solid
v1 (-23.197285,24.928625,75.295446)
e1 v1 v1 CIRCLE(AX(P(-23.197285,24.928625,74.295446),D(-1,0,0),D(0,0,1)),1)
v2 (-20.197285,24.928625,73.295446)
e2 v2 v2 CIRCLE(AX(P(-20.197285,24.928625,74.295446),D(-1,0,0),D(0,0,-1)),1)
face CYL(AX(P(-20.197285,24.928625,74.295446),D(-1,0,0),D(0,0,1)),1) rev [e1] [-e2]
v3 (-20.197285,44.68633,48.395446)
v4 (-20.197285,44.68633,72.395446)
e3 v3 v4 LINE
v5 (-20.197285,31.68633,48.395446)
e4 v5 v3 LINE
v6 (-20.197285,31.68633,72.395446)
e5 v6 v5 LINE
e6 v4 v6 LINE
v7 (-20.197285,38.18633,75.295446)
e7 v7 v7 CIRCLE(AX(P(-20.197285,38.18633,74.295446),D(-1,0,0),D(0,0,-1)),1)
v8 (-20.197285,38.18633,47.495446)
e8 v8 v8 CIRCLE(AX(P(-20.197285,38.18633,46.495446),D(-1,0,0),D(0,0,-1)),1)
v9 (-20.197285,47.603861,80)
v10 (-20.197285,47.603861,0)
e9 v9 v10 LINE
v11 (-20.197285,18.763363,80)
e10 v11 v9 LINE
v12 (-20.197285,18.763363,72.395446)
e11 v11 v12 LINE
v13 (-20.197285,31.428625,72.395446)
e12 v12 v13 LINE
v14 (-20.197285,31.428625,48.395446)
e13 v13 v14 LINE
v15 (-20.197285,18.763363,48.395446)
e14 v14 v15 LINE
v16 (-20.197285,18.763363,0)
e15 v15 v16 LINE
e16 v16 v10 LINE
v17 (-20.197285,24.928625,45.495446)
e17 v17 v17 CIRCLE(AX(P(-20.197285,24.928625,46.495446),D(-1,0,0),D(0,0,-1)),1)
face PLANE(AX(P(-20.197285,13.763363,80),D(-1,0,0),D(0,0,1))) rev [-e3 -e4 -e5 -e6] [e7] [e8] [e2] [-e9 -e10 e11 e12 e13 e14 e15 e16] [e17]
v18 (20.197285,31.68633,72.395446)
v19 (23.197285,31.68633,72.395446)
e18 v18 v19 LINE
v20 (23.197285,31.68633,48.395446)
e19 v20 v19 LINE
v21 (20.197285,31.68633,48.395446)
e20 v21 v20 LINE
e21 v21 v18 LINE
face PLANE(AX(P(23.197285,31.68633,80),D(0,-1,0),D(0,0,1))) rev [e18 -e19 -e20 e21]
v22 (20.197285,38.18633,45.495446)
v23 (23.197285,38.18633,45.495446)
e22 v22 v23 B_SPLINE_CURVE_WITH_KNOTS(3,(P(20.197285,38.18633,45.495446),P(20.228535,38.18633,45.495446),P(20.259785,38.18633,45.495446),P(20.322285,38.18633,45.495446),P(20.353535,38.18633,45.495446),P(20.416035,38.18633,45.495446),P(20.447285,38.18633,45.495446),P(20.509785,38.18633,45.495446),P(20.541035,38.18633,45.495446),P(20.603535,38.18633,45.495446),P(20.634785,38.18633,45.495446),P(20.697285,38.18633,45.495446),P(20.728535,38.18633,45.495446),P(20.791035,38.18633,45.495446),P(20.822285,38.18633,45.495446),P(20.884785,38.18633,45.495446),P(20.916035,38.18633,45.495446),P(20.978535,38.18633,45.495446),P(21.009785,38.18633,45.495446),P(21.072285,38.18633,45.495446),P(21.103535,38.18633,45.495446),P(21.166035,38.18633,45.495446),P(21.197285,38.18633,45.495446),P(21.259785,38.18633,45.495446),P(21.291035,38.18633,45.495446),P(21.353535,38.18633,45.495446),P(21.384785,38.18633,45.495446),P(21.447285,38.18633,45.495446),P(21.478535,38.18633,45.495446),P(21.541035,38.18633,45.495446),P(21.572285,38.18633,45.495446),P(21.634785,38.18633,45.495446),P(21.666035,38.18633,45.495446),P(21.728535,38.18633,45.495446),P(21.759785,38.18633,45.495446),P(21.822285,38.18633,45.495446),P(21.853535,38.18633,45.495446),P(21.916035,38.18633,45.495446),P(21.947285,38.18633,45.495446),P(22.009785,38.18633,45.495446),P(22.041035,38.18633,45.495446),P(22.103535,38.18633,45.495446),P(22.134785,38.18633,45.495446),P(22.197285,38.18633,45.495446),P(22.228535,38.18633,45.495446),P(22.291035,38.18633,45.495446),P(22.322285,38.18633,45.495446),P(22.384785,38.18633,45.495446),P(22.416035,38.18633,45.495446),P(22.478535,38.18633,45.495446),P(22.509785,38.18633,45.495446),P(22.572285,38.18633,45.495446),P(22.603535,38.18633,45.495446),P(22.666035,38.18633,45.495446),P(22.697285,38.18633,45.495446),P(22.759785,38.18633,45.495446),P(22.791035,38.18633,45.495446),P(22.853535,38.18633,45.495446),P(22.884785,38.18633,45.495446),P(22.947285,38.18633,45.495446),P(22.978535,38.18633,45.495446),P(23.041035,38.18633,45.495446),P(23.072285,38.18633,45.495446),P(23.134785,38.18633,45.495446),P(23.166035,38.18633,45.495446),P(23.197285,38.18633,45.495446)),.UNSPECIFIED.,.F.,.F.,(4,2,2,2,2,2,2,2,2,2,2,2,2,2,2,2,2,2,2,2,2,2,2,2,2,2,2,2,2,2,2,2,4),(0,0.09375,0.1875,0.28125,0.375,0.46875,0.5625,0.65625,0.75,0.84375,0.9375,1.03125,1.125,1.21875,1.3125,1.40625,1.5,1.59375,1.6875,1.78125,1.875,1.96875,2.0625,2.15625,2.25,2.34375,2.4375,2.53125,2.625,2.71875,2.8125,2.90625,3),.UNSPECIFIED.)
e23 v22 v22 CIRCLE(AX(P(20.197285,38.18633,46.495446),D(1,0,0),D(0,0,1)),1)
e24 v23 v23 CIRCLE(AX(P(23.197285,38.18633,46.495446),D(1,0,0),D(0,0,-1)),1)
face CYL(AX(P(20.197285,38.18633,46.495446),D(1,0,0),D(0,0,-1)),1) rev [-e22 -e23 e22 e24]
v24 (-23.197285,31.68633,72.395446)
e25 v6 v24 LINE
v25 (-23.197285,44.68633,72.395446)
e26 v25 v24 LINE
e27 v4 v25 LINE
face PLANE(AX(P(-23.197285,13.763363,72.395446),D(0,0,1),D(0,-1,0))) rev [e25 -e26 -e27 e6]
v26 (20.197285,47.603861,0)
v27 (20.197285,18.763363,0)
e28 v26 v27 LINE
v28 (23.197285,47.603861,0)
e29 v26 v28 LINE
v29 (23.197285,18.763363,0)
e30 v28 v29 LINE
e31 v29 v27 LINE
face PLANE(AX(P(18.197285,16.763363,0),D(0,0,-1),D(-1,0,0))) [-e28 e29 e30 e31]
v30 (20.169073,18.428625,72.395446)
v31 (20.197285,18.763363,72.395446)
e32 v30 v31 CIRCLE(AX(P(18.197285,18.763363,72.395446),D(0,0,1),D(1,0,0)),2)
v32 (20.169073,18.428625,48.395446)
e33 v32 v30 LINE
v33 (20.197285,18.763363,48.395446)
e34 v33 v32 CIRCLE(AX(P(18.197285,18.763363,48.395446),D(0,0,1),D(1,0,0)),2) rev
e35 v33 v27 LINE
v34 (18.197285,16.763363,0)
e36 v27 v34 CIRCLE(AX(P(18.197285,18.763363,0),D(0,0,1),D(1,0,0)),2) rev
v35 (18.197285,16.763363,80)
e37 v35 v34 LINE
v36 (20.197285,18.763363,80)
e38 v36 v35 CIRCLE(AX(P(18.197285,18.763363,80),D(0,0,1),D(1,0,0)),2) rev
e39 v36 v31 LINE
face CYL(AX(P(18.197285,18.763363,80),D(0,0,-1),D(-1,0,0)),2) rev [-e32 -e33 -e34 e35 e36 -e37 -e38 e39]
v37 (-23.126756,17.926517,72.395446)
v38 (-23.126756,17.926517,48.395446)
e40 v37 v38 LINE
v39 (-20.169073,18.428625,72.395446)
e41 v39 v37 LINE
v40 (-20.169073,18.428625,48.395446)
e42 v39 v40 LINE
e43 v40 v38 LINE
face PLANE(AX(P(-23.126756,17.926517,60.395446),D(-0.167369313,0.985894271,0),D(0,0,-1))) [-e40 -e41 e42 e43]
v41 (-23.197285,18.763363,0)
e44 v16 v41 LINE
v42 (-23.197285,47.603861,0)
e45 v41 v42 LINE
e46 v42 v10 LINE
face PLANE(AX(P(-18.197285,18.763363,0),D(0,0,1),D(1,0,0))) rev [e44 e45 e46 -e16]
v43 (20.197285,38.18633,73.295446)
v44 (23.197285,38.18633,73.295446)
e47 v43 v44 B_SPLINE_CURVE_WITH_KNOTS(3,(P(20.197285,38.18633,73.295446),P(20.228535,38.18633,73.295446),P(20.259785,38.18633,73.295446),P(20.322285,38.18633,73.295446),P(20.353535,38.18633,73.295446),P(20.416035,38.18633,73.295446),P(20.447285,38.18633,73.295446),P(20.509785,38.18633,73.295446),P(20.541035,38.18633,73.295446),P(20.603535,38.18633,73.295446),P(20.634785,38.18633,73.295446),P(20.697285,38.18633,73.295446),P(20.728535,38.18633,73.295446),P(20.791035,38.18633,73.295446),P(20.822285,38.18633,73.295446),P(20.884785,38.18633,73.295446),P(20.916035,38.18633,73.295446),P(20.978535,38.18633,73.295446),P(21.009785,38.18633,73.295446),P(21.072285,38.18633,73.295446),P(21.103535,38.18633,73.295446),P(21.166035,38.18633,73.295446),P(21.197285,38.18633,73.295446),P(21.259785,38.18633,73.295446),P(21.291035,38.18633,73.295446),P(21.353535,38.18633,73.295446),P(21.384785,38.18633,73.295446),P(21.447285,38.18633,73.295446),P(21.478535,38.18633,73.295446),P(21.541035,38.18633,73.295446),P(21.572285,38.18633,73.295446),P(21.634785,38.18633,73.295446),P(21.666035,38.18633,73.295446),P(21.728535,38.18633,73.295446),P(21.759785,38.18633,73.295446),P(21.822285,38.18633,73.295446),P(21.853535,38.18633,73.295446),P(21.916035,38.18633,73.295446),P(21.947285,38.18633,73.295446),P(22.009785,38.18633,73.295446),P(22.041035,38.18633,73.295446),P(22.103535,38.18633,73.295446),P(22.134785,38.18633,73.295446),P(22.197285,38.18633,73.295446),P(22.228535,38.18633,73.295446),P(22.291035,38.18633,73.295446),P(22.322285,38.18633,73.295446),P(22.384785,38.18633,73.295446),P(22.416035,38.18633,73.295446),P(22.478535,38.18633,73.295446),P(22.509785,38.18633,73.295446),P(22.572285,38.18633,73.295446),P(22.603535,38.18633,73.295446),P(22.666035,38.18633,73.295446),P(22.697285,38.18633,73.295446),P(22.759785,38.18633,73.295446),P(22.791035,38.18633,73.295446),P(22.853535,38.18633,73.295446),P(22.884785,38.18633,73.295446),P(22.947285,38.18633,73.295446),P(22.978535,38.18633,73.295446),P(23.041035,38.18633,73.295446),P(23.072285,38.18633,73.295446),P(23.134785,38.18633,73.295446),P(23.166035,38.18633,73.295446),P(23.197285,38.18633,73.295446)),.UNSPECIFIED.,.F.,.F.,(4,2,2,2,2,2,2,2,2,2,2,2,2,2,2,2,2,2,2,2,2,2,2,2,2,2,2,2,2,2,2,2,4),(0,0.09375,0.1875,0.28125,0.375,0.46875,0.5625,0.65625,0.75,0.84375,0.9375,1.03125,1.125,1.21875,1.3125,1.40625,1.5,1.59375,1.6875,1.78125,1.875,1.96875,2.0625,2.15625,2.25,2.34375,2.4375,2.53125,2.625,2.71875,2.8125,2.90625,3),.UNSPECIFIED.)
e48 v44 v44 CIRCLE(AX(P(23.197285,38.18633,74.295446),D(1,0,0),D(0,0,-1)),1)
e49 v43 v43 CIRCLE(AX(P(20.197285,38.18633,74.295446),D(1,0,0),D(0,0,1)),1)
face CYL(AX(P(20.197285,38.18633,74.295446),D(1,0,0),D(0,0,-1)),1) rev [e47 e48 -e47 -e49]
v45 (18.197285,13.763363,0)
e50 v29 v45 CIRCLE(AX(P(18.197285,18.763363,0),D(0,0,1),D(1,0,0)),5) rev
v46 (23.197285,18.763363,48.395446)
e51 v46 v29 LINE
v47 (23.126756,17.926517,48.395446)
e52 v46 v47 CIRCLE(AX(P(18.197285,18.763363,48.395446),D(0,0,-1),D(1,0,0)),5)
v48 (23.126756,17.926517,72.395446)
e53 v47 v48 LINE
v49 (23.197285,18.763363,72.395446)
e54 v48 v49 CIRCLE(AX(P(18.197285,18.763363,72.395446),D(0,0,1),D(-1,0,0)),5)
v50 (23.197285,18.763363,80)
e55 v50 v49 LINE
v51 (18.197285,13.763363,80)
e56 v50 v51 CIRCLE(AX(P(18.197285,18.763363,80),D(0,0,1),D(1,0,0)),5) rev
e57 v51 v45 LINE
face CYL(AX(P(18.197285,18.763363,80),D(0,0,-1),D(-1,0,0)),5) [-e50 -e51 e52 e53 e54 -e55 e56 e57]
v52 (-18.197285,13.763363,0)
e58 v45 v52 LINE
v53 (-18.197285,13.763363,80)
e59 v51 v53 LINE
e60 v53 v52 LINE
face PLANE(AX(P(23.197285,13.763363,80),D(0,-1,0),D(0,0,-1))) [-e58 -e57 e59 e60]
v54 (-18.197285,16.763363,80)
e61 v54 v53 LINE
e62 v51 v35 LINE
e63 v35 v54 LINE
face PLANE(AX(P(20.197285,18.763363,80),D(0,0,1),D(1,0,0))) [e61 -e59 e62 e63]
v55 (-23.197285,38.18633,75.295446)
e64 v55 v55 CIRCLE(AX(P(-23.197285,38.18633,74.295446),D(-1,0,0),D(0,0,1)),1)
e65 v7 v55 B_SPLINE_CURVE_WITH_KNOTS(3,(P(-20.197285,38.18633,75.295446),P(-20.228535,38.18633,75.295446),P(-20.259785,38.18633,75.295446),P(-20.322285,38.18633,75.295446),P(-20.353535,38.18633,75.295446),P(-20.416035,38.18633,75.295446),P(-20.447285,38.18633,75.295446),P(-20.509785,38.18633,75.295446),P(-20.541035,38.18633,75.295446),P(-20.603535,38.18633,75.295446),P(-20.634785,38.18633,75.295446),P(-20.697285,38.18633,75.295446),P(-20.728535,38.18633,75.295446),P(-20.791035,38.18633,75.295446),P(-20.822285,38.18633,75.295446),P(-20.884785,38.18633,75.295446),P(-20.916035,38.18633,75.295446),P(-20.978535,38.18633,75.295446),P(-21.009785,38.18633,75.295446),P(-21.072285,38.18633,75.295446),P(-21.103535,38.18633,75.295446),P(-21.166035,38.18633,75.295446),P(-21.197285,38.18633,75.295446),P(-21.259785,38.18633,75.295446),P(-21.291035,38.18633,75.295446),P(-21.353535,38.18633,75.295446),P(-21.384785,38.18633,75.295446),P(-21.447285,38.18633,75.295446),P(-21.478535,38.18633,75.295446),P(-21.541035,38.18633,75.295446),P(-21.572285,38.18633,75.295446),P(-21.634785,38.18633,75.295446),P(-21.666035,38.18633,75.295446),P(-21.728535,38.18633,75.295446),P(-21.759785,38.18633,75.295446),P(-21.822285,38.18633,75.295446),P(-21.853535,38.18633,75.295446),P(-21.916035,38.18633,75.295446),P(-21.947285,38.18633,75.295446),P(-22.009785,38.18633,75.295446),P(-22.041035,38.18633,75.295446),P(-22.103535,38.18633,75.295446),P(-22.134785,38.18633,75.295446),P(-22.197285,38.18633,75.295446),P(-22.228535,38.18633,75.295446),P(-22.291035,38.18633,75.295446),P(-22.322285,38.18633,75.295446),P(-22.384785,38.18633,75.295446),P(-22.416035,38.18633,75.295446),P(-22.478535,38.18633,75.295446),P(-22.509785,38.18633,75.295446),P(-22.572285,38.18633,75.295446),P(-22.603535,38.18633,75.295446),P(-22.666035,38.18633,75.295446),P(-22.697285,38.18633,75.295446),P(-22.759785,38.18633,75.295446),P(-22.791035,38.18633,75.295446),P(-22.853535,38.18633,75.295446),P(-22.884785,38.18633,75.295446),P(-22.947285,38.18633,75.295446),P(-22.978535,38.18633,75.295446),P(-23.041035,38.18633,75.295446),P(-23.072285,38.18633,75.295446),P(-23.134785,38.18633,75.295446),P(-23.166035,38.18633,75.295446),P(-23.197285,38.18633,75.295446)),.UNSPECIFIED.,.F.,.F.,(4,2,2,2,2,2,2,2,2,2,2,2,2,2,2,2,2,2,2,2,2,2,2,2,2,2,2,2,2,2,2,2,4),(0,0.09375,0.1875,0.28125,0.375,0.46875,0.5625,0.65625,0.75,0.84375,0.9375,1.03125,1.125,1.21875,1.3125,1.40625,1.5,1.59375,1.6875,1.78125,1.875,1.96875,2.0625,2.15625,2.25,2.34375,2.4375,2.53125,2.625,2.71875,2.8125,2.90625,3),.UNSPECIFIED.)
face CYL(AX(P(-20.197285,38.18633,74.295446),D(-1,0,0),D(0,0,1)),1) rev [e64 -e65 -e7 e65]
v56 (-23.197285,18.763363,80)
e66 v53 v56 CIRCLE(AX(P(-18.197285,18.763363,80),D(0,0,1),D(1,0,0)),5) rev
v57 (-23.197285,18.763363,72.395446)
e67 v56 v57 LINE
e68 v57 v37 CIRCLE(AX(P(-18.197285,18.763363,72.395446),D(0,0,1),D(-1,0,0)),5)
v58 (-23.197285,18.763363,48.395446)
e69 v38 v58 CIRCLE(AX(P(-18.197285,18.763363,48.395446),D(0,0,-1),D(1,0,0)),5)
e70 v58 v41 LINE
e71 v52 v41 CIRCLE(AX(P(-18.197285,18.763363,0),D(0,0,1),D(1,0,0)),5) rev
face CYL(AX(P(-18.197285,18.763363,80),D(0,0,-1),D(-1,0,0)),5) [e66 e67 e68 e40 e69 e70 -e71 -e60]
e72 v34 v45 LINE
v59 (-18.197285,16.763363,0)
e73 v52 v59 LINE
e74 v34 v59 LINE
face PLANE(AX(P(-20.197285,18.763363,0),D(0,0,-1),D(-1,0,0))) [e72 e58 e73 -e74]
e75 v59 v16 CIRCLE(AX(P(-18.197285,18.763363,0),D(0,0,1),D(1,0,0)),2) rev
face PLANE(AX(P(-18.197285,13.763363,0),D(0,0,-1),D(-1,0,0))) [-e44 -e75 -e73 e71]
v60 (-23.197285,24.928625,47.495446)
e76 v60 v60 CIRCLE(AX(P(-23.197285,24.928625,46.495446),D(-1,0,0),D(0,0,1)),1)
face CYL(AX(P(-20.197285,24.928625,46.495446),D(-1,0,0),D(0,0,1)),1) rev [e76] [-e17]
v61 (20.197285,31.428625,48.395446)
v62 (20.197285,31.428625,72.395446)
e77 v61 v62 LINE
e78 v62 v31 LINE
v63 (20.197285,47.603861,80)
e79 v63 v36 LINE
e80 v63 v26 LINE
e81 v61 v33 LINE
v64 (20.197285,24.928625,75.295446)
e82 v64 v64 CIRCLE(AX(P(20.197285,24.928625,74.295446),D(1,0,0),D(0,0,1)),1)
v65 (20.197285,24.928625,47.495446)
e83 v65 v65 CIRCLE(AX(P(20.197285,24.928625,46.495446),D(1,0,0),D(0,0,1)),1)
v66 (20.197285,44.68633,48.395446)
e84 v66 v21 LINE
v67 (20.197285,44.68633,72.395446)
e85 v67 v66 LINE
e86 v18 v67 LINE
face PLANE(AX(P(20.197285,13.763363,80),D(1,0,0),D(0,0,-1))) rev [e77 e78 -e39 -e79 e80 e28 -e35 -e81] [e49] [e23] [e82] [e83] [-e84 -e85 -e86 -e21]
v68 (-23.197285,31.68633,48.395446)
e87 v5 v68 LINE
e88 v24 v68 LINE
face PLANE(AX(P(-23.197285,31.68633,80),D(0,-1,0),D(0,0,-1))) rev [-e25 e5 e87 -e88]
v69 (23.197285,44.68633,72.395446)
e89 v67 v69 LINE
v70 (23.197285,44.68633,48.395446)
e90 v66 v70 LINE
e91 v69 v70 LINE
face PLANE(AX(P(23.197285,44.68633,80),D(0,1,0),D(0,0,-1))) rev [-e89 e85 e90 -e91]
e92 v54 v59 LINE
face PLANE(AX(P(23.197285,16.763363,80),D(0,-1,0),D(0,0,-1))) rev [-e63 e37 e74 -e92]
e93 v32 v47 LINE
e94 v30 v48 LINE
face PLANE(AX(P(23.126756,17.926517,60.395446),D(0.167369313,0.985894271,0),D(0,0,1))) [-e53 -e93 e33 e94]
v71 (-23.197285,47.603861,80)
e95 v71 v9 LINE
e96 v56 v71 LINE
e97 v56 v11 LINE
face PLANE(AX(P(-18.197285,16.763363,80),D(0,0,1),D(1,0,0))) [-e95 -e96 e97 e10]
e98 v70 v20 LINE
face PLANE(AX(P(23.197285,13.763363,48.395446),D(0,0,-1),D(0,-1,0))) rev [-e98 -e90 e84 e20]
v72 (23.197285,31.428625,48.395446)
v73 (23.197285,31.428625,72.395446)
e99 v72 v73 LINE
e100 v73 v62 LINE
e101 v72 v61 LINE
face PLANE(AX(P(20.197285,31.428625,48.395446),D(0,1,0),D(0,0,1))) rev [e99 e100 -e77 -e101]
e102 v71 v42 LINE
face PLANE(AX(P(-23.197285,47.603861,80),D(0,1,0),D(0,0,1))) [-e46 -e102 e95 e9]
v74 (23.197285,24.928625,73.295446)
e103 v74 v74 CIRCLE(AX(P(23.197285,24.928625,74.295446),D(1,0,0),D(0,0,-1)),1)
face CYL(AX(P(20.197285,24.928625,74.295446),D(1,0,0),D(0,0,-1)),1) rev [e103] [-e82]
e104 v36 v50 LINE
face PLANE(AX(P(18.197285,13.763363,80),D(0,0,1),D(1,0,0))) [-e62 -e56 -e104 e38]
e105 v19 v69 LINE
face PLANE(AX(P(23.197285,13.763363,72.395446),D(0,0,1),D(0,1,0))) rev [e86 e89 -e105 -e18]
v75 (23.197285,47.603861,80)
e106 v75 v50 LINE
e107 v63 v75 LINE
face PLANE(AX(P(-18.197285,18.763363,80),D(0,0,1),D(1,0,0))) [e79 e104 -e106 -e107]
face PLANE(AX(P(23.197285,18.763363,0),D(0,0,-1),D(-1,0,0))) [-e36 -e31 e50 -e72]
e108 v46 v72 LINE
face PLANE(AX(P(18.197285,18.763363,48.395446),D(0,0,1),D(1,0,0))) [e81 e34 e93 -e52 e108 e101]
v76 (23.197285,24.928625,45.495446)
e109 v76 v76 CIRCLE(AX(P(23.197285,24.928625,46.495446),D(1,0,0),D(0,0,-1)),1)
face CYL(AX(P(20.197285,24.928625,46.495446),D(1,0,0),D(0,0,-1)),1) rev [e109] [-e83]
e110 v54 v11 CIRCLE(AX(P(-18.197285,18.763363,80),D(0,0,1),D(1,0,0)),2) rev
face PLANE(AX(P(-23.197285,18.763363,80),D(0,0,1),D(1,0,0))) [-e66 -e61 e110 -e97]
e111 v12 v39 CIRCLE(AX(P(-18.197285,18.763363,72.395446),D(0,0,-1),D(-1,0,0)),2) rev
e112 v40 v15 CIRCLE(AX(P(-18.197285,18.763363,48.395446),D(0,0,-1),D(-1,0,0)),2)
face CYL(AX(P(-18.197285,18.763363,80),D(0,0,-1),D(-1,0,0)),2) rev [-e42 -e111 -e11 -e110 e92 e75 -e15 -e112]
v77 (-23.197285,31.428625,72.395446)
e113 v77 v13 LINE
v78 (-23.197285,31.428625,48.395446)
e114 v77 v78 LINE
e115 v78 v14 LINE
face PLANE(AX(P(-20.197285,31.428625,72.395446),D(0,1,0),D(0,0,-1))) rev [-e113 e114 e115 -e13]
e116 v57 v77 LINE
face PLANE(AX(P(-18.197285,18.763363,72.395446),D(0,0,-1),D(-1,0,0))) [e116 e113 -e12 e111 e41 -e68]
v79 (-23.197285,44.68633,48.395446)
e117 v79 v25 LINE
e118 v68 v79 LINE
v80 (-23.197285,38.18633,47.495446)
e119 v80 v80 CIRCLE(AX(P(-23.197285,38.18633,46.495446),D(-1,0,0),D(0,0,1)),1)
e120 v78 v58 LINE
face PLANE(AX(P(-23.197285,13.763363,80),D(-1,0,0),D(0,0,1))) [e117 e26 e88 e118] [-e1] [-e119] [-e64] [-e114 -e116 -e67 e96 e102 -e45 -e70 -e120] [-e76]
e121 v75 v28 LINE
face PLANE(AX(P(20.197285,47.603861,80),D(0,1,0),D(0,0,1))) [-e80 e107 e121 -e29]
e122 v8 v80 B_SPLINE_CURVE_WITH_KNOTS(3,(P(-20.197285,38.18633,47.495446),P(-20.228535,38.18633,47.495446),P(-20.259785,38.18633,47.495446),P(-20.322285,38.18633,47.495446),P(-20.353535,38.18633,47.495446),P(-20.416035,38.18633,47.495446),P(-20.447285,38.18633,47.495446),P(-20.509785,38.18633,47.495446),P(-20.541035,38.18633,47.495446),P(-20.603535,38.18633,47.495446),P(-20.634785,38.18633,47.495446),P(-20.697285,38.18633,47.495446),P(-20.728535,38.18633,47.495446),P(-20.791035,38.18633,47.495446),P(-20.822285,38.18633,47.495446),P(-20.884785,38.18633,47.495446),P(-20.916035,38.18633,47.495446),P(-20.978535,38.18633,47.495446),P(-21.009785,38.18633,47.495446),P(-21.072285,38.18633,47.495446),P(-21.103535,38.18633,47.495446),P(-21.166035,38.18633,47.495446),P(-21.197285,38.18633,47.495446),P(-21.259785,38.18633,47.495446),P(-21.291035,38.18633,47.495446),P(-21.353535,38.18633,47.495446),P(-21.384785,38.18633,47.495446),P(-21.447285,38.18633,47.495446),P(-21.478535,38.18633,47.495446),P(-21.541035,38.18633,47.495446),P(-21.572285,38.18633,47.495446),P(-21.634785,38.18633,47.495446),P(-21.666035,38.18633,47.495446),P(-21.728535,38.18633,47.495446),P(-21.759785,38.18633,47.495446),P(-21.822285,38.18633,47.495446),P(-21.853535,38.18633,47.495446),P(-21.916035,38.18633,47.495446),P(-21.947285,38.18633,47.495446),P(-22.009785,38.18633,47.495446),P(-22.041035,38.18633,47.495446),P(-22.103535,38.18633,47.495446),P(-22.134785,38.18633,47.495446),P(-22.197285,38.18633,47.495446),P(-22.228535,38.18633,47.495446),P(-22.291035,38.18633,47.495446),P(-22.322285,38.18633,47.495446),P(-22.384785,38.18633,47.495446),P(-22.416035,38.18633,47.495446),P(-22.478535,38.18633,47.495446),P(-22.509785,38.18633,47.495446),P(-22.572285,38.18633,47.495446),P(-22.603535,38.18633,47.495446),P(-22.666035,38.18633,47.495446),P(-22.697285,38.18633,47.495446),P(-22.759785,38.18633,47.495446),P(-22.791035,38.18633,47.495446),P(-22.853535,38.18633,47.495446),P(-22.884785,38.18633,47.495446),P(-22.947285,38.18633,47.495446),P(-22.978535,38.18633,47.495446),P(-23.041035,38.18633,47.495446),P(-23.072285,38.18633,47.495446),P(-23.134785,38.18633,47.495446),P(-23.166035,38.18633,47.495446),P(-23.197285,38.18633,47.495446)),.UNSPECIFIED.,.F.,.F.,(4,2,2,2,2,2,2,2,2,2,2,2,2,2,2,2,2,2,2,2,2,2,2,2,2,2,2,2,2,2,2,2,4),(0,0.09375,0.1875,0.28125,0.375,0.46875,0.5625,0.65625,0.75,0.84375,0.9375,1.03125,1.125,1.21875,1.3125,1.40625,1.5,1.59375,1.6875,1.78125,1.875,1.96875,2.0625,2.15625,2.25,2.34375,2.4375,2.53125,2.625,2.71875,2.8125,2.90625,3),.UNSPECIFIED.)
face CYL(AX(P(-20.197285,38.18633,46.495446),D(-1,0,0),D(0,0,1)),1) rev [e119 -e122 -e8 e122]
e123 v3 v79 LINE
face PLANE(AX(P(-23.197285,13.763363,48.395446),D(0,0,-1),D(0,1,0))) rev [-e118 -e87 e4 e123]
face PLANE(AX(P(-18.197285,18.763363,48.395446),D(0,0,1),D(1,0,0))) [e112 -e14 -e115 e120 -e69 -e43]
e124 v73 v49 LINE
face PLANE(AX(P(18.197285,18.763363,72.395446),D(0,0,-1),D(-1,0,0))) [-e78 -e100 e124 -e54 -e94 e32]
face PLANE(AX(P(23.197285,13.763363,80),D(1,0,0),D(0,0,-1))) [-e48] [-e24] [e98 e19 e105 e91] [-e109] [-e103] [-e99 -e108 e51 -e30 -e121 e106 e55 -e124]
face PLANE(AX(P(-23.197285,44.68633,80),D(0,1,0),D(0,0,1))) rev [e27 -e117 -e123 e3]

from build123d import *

# Parameters (mm, degrees)
BASE_FLANGE1_DEPTH       = 80
CUT_EXTRUDE1_START       = 48.39544582
CUT_EXTRUDE1_OUTLINE_W   = 3
CUT_EXTRUDE1_OUTLINE_H   = 13
CUT_EXTRUDE1_DEPTH       = 24
CUT_EXTRUDE1_START_2     = -46.394569282
CUT_EXTRUDE1_2_OUTLINE_R = 1
CUT_EXTRUDE1_2_DEPTH     = 46.394569282


# Read off the part's stored shape, not the designer's step: Cut-Extrude1
# Sheet-metal steps are written as plain solids
with BuildPart() as part:
    # Sketch1 → Base-Flange1 (new body)
    with BuildSketch(Plane.XY):
        with BuildLine():
            Line((23.197284641, 47.603861413), (23.197284641, 18.763363208))
            ThreePointArc((23.197284641, 18.763363208), (21.732818547, 15.227829302), (18.197284641, 13.763363208))
            Line((18.197284641, 13.763363208), (-18.197284641, 13.763363208))
            ThreePointArc((-18.197284641, 13.763363208), (-21.732818547, 15.227829302), (-23.197284641, 18.763363208))
            Line((-23.197284641, 18.763363208), (-23.197284641, 47.603861413))
            Line((-23.197284641, 47.603861413), (-20.197284641, 47.603861413))
            Line((-20.197284641, 47.603861413), (-20.197284641, 18.763363208))
            ThreePointArc((-20.197284641, 18.763363208), (-19.611498203, 17.349149646), (-18.197284641, 16.763363208))
            Line((-18.197284641, 16.763363208), (18.197284641, 16.763363208))
            ThreePointArc((18.197284641, 16.763363208), (19.611498203, 17.349149646), (20.197284641, 18.763363208))
            Line((20.197284641, 18.763363208), (20.197284641, 47.603861413))
            Line((20.197284641, 47.603861413), (23.197284641, 47.603861413))
        make_face()
    extrude(amount=BASE_FLANGE1_DEPTH)

    # Cut-Extrude1 outline → Cut-Extrude1 (cut)
    with BuildSketch(Plane.XY.offset(CUT_EXTRUDE1_START)):
        with BuildLine():
            Line((-20.197284641, 18.763363208), (-20.197284641, 31.428624583))
            Line((-20.197284641, 31.428624583), (-23.197284641, 31.428624583))
            Line((-23.197284641, 31.428624583), (-23.197284641, 18.763363208))
            ThreePointArc((-23.197284641, 18.763363208), (-23.17962128, 18.343456534), (-23.126755995, 17.926516645))
            Line((-23.126755995, 17.926516645), (-20.169073182, 18.428624583))
            ThreePointArc((-20.169073182, 18.428624583), (-20.190219297, 18.595400538), (-20.197284641, 18.763363208))
        make_face()
        with Locations((-21.697284641, 38.186330489)):
            Rectangle(CUT_EXTRUDE1_OUTLINE_W, CUT_EXTRUDE1_OUTLINE_H)
        with BuildLine():
            Line((23.197284641, 18.763363208), (23.197284641, 31.428624583))
            Line((23.197284641, 31.428624583), (20.197284641, 31.428624583))
            Line((20.197284641, 31.428624583), (20.197284641, 18.763363208))
            ThreePointArc((20.197284641, 18.763363208), (20.190219297, 18.595400538), (20.169073182, 18.428624583))
            Line((20.169073182, 18.428624583), (23.126755995, 17.926516645))
            ThreePointArc((23.126755995, 17.926516645), (23.17962128, 18.343456534), (23.197284641, 18.763363208))
        make_face()
        with Locations((21.697284641, 38.186330489)):
            Rectangle(CUT_EXTRUDE1_OUTLINE_W, CUT_EXTRUDE1_OUTLINE_H)
    extrude(amount=CUT_EXTRUDE1_DEPTH, mode=Mode.SUBTRACT)

    # Cut-Extrude1 2 outline → Cut-Extrude1 2 (cut)
    with BuildSketch(Plane.ZY.offset(23.197284641).offset(CUT_EXTRUDE1_START_2)):
        with Locations((74.29544582, 24.928624583)):
            Circle(CUT_EXTRUDE1_2_OUTLINE_R)
        with Locations((46.49544582, 24.928624583)):
            Circle(CUT_EXTRUDE1_2_OUTLINE_R)
        with Locations((74.29544582, 38.186330489)):
            Circle(CUT_EXTRUDE1_2_OUTLINE_R)
        with Locations((46.49544582, 38.186330489)):
            Circle(CUT_EXTRUDE1_2_OUTLINE_R)
    extrude(amount=CUT_EXTRUDE1_2_DEPTH, mode=Mode.SUBTRACT)


solid = part.part
